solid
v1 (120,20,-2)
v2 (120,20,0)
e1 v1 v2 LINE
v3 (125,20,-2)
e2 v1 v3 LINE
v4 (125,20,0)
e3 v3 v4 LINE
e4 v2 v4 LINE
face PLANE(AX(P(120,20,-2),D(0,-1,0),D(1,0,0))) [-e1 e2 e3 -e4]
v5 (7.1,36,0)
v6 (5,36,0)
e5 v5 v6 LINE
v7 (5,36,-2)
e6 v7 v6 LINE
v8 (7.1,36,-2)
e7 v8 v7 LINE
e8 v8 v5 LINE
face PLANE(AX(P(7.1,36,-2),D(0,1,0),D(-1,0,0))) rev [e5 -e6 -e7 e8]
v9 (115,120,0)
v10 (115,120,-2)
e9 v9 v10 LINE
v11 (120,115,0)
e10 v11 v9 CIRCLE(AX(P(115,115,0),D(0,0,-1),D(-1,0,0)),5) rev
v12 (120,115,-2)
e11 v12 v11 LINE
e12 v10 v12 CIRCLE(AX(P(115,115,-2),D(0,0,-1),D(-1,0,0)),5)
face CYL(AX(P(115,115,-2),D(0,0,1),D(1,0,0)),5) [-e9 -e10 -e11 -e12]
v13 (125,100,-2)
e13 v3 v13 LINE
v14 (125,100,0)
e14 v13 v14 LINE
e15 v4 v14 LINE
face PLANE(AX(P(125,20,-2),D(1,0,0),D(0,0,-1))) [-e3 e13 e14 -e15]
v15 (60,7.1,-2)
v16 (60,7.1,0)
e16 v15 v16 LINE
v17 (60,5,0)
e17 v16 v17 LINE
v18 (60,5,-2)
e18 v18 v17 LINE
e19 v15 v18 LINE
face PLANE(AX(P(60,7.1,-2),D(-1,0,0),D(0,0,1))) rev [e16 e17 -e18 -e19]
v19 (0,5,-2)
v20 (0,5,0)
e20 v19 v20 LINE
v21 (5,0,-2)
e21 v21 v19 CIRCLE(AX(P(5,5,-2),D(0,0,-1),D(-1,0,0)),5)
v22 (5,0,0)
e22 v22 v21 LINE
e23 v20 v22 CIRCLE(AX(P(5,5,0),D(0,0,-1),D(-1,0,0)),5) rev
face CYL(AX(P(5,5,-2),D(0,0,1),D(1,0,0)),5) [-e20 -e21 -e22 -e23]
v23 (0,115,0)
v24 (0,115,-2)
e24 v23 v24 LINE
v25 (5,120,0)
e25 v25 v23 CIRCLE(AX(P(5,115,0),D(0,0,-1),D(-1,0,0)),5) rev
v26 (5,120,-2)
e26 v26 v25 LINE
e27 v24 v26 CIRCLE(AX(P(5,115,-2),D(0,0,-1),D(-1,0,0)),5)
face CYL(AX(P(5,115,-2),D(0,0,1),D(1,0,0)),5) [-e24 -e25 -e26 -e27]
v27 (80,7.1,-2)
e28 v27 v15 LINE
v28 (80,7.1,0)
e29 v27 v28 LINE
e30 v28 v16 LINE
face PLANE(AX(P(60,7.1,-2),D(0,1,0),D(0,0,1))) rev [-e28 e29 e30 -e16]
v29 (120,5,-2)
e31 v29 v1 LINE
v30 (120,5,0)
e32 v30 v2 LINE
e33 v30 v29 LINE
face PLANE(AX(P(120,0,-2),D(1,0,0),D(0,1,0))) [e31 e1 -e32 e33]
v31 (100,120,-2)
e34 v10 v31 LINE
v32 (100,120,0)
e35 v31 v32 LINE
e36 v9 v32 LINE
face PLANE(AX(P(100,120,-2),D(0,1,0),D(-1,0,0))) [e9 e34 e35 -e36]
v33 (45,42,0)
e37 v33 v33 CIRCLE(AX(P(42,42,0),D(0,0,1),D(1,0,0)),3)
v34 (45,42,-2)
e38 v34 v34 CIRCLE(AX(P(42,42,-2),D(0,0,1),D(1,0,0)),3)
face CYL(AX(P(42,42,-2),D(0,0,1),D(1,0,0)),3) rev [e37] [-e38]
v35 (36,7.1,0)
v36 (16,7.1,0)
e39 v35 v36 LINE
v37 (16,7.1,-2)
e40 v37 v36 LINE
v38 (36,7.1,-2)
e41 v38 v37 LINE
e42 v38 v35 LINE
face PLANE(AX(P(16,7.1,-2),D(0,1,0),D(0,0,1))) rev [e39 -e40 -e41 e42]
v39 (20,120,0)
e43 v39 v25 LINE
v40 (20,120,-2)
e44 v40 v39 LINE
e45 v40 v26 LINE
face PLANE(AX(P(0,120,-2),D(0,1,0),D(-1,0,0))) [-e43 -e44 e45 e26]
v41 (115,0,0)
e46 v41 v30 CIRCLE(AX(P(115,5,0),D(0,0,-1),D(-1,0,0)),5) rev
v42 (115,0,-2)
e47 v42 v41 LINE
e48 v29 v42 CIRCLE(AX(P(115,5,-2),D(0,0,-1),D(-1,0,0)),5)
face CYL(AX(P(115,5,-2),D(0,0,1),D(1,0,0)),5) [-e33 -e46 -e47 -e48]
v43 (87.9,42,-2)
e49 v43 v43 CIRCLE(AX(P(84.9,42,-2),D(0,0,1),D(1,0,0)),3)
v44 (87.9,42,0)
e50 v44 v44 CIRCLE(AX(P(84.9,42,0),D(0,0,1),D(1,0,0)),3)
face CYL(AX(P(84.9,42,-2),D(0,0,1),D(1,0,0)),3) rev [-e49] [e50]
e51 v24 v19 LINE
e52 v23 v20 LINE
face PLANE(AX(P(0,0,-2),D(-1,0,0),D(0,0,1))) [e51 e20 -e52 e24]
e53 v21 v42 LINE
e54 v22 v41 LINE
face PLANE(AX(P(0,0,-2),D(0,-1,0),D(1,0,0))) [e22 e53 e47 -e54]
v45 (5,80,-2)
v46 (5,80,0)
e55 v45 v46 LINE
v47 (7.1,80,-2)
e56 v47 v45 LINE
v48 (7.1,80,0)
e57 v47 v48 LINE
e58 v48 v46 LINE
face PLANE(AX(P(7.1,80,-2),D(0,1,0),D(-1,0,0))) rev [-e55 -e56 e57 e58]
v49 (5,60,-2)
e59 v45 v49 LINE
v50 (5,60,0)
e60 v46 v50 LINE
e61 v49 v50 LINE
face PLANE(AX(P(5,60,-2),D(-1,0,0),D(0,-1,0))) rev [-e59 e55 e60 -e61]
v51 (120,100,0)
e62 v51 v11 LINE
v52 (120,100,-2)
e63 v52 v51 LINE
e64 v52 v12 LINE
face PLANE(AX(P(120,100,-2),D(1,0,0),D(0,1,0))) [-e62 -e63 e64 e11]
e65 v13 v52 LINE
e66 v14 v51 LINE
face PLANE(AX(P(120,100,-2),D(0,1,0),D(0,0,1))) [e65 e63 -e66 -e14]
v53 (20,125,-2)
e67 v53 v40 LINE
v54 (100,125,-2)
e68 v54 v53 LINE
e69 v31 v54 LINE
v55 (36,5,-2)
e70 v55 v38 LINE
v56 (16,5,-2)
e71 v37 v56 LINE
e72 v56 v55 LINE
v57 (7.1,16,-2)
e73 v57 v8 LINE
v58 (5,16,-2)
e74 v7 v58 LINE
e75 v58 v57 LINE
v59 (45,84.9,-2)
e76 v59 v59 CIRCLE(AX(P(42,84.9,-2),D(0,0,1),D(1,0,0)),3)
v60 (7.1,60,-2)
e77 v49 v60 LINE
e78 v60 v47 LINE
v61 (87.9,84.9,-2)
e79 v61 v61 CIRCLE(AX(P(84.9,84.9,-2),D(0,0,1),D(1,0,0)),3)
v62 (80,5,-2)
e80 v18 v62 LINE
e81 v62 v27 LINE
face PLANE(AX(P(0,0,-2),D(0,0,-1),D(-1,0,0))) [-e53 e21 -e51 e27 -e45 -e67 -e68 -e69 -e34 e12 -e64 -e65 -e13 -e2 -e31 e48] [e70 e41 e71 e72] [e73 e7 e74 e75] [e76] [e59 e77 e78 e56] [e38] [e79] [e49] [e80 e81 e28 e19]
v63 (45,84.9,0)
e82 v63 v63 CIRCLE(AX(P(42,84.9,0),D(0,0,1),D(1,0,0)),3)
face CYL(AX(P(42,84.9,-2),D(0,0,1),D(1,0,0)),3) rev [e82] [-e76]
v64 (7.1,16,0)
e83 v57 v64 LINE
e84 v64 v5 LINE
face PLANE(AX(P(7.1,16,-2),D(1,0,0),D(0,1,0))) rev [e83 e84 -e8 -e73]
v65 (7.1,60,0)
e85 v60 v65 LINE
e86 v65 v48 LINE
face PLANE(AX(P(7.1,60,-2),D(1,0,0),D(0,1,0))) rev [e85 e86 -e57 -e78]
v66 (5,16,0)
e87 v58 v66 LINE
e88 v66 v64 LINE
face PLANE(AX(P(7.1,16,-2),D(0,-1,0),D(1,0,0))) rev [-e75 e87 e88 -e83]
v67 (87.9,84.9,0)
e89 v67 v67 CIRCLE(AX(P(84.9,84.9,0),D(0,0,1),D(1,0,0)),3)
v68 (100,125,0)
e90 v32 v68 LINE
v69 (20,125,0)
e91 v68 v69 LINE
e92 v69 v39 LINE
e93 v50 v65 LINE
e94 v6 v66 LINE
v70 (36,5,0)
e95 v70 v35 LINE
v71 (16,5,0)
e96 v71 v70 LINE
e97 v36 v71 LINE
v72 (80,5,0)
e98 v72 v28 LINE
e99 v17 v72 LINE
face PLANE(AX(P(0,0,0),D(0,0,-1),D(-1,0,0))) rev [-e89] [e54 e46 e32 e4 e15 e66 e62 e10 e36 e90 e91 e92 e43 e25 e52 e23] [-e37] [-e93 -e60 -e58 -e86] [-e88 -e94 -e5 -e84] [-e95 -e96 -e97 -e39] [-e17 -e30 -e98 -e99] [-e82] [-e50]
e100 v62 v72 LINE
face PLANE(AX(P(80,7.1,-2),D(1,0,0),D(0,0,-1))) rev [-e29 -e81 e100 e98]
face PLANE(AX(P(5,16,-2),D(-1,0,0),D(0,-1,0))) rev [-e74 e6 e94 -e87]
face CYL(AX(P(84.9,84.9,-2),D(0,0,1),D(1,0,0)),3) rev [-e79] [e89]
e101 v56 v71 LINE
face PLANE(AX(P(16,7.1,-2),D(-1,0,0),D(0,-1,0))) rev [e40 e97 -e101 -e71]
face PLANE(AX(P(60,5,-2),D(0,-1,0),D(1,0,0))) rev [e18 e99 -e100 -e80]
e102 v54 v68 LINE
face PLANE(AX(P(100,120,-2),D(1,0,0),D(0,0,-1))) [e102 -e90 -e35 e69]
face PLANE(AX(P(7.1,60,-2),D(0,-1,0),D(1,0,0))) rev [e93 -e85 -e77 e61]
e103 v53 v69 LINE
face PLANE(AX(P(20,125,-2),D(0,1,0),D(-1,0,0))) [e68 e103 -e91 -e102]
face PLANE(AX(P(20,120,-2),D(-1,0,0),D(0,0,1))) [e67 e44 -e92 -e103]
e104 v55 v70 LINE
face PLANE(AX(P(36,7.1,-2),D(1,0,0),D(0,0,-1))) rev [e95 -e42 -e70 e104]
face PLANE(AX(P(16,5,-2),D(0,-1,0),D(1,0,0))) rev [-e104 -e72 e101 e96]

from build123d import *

# Parameters (mm, degrees)
SKETCH1_R          = 3
SKETCH1_W          = 20
SKETCH1_H          = 2.1
SKETCH1_W_2        = 2.1
SKETCH1_H_2        = 20
BASE_FLANGE1_DEPTH = 2
FILLET1_R          = 5


# Sheet-metal steps are written as plain solids
with BuildPart() as part:
    # Sketch1 → Base-Flange1 (new body)
    with BuildSketch(Plane.XY):
        Polygon((0, 0), (120, 0), (120, 20), (125, 20), (125, 100), (120, 100), (120, 120), (100, 120), (100, 125), (20, 125), (20, 120), (0, 120), align=None)
        with Locations((42, 42)):
            Circle(SKETCH1_R, mode=Mode.SUBTRACT)
        with Locations((84.9, 42)):
            Circle(SKETCH1_R, mode=Mode.SUBTRACT)
        with Locations((42, 84.9)):
            Circle(SKETCH1_R, mode=Mode.SUBTRACT)
        with Locations((84.9, 84.9)):
            Circle(SKETCH1_R, mode=Mode.SUBTRACT)
        with Locations((26, 6.05)):
            Rectangle(SKETCH1_W, SKETCH1_H, mode=Mode.SUBTRACT)
        with Locations((70, 6.05)):
            Rectangle(SKETCH1_W, SKETCH1_H, mode=Mode.SUBTRACT)
        with Locations((6.05, 26)):
            Rectangle(SKETCH1_W_2, SKETCH1_H_2, mode=Mode.SUBTRACT)
        with Locations((6.05, 70)):
            Rectangle(SKETCH1_W_2, SKETCH1_H_2, mode=Mode.SUBTRACT)
    extrude(amount=-BASE_FLANGE1_DEPTH)

    # Fillet1
    fillet1_edges = [part.edges().sort_by_distance(p)[0] for p in [
        (0, 120, -1),
        (120, 120, -1),
        (120, 0, -1),
        (0, 0, -1),
    ]]
    fillet(fillet1_edges, radius=FILLET1_R)


solid = part.part
